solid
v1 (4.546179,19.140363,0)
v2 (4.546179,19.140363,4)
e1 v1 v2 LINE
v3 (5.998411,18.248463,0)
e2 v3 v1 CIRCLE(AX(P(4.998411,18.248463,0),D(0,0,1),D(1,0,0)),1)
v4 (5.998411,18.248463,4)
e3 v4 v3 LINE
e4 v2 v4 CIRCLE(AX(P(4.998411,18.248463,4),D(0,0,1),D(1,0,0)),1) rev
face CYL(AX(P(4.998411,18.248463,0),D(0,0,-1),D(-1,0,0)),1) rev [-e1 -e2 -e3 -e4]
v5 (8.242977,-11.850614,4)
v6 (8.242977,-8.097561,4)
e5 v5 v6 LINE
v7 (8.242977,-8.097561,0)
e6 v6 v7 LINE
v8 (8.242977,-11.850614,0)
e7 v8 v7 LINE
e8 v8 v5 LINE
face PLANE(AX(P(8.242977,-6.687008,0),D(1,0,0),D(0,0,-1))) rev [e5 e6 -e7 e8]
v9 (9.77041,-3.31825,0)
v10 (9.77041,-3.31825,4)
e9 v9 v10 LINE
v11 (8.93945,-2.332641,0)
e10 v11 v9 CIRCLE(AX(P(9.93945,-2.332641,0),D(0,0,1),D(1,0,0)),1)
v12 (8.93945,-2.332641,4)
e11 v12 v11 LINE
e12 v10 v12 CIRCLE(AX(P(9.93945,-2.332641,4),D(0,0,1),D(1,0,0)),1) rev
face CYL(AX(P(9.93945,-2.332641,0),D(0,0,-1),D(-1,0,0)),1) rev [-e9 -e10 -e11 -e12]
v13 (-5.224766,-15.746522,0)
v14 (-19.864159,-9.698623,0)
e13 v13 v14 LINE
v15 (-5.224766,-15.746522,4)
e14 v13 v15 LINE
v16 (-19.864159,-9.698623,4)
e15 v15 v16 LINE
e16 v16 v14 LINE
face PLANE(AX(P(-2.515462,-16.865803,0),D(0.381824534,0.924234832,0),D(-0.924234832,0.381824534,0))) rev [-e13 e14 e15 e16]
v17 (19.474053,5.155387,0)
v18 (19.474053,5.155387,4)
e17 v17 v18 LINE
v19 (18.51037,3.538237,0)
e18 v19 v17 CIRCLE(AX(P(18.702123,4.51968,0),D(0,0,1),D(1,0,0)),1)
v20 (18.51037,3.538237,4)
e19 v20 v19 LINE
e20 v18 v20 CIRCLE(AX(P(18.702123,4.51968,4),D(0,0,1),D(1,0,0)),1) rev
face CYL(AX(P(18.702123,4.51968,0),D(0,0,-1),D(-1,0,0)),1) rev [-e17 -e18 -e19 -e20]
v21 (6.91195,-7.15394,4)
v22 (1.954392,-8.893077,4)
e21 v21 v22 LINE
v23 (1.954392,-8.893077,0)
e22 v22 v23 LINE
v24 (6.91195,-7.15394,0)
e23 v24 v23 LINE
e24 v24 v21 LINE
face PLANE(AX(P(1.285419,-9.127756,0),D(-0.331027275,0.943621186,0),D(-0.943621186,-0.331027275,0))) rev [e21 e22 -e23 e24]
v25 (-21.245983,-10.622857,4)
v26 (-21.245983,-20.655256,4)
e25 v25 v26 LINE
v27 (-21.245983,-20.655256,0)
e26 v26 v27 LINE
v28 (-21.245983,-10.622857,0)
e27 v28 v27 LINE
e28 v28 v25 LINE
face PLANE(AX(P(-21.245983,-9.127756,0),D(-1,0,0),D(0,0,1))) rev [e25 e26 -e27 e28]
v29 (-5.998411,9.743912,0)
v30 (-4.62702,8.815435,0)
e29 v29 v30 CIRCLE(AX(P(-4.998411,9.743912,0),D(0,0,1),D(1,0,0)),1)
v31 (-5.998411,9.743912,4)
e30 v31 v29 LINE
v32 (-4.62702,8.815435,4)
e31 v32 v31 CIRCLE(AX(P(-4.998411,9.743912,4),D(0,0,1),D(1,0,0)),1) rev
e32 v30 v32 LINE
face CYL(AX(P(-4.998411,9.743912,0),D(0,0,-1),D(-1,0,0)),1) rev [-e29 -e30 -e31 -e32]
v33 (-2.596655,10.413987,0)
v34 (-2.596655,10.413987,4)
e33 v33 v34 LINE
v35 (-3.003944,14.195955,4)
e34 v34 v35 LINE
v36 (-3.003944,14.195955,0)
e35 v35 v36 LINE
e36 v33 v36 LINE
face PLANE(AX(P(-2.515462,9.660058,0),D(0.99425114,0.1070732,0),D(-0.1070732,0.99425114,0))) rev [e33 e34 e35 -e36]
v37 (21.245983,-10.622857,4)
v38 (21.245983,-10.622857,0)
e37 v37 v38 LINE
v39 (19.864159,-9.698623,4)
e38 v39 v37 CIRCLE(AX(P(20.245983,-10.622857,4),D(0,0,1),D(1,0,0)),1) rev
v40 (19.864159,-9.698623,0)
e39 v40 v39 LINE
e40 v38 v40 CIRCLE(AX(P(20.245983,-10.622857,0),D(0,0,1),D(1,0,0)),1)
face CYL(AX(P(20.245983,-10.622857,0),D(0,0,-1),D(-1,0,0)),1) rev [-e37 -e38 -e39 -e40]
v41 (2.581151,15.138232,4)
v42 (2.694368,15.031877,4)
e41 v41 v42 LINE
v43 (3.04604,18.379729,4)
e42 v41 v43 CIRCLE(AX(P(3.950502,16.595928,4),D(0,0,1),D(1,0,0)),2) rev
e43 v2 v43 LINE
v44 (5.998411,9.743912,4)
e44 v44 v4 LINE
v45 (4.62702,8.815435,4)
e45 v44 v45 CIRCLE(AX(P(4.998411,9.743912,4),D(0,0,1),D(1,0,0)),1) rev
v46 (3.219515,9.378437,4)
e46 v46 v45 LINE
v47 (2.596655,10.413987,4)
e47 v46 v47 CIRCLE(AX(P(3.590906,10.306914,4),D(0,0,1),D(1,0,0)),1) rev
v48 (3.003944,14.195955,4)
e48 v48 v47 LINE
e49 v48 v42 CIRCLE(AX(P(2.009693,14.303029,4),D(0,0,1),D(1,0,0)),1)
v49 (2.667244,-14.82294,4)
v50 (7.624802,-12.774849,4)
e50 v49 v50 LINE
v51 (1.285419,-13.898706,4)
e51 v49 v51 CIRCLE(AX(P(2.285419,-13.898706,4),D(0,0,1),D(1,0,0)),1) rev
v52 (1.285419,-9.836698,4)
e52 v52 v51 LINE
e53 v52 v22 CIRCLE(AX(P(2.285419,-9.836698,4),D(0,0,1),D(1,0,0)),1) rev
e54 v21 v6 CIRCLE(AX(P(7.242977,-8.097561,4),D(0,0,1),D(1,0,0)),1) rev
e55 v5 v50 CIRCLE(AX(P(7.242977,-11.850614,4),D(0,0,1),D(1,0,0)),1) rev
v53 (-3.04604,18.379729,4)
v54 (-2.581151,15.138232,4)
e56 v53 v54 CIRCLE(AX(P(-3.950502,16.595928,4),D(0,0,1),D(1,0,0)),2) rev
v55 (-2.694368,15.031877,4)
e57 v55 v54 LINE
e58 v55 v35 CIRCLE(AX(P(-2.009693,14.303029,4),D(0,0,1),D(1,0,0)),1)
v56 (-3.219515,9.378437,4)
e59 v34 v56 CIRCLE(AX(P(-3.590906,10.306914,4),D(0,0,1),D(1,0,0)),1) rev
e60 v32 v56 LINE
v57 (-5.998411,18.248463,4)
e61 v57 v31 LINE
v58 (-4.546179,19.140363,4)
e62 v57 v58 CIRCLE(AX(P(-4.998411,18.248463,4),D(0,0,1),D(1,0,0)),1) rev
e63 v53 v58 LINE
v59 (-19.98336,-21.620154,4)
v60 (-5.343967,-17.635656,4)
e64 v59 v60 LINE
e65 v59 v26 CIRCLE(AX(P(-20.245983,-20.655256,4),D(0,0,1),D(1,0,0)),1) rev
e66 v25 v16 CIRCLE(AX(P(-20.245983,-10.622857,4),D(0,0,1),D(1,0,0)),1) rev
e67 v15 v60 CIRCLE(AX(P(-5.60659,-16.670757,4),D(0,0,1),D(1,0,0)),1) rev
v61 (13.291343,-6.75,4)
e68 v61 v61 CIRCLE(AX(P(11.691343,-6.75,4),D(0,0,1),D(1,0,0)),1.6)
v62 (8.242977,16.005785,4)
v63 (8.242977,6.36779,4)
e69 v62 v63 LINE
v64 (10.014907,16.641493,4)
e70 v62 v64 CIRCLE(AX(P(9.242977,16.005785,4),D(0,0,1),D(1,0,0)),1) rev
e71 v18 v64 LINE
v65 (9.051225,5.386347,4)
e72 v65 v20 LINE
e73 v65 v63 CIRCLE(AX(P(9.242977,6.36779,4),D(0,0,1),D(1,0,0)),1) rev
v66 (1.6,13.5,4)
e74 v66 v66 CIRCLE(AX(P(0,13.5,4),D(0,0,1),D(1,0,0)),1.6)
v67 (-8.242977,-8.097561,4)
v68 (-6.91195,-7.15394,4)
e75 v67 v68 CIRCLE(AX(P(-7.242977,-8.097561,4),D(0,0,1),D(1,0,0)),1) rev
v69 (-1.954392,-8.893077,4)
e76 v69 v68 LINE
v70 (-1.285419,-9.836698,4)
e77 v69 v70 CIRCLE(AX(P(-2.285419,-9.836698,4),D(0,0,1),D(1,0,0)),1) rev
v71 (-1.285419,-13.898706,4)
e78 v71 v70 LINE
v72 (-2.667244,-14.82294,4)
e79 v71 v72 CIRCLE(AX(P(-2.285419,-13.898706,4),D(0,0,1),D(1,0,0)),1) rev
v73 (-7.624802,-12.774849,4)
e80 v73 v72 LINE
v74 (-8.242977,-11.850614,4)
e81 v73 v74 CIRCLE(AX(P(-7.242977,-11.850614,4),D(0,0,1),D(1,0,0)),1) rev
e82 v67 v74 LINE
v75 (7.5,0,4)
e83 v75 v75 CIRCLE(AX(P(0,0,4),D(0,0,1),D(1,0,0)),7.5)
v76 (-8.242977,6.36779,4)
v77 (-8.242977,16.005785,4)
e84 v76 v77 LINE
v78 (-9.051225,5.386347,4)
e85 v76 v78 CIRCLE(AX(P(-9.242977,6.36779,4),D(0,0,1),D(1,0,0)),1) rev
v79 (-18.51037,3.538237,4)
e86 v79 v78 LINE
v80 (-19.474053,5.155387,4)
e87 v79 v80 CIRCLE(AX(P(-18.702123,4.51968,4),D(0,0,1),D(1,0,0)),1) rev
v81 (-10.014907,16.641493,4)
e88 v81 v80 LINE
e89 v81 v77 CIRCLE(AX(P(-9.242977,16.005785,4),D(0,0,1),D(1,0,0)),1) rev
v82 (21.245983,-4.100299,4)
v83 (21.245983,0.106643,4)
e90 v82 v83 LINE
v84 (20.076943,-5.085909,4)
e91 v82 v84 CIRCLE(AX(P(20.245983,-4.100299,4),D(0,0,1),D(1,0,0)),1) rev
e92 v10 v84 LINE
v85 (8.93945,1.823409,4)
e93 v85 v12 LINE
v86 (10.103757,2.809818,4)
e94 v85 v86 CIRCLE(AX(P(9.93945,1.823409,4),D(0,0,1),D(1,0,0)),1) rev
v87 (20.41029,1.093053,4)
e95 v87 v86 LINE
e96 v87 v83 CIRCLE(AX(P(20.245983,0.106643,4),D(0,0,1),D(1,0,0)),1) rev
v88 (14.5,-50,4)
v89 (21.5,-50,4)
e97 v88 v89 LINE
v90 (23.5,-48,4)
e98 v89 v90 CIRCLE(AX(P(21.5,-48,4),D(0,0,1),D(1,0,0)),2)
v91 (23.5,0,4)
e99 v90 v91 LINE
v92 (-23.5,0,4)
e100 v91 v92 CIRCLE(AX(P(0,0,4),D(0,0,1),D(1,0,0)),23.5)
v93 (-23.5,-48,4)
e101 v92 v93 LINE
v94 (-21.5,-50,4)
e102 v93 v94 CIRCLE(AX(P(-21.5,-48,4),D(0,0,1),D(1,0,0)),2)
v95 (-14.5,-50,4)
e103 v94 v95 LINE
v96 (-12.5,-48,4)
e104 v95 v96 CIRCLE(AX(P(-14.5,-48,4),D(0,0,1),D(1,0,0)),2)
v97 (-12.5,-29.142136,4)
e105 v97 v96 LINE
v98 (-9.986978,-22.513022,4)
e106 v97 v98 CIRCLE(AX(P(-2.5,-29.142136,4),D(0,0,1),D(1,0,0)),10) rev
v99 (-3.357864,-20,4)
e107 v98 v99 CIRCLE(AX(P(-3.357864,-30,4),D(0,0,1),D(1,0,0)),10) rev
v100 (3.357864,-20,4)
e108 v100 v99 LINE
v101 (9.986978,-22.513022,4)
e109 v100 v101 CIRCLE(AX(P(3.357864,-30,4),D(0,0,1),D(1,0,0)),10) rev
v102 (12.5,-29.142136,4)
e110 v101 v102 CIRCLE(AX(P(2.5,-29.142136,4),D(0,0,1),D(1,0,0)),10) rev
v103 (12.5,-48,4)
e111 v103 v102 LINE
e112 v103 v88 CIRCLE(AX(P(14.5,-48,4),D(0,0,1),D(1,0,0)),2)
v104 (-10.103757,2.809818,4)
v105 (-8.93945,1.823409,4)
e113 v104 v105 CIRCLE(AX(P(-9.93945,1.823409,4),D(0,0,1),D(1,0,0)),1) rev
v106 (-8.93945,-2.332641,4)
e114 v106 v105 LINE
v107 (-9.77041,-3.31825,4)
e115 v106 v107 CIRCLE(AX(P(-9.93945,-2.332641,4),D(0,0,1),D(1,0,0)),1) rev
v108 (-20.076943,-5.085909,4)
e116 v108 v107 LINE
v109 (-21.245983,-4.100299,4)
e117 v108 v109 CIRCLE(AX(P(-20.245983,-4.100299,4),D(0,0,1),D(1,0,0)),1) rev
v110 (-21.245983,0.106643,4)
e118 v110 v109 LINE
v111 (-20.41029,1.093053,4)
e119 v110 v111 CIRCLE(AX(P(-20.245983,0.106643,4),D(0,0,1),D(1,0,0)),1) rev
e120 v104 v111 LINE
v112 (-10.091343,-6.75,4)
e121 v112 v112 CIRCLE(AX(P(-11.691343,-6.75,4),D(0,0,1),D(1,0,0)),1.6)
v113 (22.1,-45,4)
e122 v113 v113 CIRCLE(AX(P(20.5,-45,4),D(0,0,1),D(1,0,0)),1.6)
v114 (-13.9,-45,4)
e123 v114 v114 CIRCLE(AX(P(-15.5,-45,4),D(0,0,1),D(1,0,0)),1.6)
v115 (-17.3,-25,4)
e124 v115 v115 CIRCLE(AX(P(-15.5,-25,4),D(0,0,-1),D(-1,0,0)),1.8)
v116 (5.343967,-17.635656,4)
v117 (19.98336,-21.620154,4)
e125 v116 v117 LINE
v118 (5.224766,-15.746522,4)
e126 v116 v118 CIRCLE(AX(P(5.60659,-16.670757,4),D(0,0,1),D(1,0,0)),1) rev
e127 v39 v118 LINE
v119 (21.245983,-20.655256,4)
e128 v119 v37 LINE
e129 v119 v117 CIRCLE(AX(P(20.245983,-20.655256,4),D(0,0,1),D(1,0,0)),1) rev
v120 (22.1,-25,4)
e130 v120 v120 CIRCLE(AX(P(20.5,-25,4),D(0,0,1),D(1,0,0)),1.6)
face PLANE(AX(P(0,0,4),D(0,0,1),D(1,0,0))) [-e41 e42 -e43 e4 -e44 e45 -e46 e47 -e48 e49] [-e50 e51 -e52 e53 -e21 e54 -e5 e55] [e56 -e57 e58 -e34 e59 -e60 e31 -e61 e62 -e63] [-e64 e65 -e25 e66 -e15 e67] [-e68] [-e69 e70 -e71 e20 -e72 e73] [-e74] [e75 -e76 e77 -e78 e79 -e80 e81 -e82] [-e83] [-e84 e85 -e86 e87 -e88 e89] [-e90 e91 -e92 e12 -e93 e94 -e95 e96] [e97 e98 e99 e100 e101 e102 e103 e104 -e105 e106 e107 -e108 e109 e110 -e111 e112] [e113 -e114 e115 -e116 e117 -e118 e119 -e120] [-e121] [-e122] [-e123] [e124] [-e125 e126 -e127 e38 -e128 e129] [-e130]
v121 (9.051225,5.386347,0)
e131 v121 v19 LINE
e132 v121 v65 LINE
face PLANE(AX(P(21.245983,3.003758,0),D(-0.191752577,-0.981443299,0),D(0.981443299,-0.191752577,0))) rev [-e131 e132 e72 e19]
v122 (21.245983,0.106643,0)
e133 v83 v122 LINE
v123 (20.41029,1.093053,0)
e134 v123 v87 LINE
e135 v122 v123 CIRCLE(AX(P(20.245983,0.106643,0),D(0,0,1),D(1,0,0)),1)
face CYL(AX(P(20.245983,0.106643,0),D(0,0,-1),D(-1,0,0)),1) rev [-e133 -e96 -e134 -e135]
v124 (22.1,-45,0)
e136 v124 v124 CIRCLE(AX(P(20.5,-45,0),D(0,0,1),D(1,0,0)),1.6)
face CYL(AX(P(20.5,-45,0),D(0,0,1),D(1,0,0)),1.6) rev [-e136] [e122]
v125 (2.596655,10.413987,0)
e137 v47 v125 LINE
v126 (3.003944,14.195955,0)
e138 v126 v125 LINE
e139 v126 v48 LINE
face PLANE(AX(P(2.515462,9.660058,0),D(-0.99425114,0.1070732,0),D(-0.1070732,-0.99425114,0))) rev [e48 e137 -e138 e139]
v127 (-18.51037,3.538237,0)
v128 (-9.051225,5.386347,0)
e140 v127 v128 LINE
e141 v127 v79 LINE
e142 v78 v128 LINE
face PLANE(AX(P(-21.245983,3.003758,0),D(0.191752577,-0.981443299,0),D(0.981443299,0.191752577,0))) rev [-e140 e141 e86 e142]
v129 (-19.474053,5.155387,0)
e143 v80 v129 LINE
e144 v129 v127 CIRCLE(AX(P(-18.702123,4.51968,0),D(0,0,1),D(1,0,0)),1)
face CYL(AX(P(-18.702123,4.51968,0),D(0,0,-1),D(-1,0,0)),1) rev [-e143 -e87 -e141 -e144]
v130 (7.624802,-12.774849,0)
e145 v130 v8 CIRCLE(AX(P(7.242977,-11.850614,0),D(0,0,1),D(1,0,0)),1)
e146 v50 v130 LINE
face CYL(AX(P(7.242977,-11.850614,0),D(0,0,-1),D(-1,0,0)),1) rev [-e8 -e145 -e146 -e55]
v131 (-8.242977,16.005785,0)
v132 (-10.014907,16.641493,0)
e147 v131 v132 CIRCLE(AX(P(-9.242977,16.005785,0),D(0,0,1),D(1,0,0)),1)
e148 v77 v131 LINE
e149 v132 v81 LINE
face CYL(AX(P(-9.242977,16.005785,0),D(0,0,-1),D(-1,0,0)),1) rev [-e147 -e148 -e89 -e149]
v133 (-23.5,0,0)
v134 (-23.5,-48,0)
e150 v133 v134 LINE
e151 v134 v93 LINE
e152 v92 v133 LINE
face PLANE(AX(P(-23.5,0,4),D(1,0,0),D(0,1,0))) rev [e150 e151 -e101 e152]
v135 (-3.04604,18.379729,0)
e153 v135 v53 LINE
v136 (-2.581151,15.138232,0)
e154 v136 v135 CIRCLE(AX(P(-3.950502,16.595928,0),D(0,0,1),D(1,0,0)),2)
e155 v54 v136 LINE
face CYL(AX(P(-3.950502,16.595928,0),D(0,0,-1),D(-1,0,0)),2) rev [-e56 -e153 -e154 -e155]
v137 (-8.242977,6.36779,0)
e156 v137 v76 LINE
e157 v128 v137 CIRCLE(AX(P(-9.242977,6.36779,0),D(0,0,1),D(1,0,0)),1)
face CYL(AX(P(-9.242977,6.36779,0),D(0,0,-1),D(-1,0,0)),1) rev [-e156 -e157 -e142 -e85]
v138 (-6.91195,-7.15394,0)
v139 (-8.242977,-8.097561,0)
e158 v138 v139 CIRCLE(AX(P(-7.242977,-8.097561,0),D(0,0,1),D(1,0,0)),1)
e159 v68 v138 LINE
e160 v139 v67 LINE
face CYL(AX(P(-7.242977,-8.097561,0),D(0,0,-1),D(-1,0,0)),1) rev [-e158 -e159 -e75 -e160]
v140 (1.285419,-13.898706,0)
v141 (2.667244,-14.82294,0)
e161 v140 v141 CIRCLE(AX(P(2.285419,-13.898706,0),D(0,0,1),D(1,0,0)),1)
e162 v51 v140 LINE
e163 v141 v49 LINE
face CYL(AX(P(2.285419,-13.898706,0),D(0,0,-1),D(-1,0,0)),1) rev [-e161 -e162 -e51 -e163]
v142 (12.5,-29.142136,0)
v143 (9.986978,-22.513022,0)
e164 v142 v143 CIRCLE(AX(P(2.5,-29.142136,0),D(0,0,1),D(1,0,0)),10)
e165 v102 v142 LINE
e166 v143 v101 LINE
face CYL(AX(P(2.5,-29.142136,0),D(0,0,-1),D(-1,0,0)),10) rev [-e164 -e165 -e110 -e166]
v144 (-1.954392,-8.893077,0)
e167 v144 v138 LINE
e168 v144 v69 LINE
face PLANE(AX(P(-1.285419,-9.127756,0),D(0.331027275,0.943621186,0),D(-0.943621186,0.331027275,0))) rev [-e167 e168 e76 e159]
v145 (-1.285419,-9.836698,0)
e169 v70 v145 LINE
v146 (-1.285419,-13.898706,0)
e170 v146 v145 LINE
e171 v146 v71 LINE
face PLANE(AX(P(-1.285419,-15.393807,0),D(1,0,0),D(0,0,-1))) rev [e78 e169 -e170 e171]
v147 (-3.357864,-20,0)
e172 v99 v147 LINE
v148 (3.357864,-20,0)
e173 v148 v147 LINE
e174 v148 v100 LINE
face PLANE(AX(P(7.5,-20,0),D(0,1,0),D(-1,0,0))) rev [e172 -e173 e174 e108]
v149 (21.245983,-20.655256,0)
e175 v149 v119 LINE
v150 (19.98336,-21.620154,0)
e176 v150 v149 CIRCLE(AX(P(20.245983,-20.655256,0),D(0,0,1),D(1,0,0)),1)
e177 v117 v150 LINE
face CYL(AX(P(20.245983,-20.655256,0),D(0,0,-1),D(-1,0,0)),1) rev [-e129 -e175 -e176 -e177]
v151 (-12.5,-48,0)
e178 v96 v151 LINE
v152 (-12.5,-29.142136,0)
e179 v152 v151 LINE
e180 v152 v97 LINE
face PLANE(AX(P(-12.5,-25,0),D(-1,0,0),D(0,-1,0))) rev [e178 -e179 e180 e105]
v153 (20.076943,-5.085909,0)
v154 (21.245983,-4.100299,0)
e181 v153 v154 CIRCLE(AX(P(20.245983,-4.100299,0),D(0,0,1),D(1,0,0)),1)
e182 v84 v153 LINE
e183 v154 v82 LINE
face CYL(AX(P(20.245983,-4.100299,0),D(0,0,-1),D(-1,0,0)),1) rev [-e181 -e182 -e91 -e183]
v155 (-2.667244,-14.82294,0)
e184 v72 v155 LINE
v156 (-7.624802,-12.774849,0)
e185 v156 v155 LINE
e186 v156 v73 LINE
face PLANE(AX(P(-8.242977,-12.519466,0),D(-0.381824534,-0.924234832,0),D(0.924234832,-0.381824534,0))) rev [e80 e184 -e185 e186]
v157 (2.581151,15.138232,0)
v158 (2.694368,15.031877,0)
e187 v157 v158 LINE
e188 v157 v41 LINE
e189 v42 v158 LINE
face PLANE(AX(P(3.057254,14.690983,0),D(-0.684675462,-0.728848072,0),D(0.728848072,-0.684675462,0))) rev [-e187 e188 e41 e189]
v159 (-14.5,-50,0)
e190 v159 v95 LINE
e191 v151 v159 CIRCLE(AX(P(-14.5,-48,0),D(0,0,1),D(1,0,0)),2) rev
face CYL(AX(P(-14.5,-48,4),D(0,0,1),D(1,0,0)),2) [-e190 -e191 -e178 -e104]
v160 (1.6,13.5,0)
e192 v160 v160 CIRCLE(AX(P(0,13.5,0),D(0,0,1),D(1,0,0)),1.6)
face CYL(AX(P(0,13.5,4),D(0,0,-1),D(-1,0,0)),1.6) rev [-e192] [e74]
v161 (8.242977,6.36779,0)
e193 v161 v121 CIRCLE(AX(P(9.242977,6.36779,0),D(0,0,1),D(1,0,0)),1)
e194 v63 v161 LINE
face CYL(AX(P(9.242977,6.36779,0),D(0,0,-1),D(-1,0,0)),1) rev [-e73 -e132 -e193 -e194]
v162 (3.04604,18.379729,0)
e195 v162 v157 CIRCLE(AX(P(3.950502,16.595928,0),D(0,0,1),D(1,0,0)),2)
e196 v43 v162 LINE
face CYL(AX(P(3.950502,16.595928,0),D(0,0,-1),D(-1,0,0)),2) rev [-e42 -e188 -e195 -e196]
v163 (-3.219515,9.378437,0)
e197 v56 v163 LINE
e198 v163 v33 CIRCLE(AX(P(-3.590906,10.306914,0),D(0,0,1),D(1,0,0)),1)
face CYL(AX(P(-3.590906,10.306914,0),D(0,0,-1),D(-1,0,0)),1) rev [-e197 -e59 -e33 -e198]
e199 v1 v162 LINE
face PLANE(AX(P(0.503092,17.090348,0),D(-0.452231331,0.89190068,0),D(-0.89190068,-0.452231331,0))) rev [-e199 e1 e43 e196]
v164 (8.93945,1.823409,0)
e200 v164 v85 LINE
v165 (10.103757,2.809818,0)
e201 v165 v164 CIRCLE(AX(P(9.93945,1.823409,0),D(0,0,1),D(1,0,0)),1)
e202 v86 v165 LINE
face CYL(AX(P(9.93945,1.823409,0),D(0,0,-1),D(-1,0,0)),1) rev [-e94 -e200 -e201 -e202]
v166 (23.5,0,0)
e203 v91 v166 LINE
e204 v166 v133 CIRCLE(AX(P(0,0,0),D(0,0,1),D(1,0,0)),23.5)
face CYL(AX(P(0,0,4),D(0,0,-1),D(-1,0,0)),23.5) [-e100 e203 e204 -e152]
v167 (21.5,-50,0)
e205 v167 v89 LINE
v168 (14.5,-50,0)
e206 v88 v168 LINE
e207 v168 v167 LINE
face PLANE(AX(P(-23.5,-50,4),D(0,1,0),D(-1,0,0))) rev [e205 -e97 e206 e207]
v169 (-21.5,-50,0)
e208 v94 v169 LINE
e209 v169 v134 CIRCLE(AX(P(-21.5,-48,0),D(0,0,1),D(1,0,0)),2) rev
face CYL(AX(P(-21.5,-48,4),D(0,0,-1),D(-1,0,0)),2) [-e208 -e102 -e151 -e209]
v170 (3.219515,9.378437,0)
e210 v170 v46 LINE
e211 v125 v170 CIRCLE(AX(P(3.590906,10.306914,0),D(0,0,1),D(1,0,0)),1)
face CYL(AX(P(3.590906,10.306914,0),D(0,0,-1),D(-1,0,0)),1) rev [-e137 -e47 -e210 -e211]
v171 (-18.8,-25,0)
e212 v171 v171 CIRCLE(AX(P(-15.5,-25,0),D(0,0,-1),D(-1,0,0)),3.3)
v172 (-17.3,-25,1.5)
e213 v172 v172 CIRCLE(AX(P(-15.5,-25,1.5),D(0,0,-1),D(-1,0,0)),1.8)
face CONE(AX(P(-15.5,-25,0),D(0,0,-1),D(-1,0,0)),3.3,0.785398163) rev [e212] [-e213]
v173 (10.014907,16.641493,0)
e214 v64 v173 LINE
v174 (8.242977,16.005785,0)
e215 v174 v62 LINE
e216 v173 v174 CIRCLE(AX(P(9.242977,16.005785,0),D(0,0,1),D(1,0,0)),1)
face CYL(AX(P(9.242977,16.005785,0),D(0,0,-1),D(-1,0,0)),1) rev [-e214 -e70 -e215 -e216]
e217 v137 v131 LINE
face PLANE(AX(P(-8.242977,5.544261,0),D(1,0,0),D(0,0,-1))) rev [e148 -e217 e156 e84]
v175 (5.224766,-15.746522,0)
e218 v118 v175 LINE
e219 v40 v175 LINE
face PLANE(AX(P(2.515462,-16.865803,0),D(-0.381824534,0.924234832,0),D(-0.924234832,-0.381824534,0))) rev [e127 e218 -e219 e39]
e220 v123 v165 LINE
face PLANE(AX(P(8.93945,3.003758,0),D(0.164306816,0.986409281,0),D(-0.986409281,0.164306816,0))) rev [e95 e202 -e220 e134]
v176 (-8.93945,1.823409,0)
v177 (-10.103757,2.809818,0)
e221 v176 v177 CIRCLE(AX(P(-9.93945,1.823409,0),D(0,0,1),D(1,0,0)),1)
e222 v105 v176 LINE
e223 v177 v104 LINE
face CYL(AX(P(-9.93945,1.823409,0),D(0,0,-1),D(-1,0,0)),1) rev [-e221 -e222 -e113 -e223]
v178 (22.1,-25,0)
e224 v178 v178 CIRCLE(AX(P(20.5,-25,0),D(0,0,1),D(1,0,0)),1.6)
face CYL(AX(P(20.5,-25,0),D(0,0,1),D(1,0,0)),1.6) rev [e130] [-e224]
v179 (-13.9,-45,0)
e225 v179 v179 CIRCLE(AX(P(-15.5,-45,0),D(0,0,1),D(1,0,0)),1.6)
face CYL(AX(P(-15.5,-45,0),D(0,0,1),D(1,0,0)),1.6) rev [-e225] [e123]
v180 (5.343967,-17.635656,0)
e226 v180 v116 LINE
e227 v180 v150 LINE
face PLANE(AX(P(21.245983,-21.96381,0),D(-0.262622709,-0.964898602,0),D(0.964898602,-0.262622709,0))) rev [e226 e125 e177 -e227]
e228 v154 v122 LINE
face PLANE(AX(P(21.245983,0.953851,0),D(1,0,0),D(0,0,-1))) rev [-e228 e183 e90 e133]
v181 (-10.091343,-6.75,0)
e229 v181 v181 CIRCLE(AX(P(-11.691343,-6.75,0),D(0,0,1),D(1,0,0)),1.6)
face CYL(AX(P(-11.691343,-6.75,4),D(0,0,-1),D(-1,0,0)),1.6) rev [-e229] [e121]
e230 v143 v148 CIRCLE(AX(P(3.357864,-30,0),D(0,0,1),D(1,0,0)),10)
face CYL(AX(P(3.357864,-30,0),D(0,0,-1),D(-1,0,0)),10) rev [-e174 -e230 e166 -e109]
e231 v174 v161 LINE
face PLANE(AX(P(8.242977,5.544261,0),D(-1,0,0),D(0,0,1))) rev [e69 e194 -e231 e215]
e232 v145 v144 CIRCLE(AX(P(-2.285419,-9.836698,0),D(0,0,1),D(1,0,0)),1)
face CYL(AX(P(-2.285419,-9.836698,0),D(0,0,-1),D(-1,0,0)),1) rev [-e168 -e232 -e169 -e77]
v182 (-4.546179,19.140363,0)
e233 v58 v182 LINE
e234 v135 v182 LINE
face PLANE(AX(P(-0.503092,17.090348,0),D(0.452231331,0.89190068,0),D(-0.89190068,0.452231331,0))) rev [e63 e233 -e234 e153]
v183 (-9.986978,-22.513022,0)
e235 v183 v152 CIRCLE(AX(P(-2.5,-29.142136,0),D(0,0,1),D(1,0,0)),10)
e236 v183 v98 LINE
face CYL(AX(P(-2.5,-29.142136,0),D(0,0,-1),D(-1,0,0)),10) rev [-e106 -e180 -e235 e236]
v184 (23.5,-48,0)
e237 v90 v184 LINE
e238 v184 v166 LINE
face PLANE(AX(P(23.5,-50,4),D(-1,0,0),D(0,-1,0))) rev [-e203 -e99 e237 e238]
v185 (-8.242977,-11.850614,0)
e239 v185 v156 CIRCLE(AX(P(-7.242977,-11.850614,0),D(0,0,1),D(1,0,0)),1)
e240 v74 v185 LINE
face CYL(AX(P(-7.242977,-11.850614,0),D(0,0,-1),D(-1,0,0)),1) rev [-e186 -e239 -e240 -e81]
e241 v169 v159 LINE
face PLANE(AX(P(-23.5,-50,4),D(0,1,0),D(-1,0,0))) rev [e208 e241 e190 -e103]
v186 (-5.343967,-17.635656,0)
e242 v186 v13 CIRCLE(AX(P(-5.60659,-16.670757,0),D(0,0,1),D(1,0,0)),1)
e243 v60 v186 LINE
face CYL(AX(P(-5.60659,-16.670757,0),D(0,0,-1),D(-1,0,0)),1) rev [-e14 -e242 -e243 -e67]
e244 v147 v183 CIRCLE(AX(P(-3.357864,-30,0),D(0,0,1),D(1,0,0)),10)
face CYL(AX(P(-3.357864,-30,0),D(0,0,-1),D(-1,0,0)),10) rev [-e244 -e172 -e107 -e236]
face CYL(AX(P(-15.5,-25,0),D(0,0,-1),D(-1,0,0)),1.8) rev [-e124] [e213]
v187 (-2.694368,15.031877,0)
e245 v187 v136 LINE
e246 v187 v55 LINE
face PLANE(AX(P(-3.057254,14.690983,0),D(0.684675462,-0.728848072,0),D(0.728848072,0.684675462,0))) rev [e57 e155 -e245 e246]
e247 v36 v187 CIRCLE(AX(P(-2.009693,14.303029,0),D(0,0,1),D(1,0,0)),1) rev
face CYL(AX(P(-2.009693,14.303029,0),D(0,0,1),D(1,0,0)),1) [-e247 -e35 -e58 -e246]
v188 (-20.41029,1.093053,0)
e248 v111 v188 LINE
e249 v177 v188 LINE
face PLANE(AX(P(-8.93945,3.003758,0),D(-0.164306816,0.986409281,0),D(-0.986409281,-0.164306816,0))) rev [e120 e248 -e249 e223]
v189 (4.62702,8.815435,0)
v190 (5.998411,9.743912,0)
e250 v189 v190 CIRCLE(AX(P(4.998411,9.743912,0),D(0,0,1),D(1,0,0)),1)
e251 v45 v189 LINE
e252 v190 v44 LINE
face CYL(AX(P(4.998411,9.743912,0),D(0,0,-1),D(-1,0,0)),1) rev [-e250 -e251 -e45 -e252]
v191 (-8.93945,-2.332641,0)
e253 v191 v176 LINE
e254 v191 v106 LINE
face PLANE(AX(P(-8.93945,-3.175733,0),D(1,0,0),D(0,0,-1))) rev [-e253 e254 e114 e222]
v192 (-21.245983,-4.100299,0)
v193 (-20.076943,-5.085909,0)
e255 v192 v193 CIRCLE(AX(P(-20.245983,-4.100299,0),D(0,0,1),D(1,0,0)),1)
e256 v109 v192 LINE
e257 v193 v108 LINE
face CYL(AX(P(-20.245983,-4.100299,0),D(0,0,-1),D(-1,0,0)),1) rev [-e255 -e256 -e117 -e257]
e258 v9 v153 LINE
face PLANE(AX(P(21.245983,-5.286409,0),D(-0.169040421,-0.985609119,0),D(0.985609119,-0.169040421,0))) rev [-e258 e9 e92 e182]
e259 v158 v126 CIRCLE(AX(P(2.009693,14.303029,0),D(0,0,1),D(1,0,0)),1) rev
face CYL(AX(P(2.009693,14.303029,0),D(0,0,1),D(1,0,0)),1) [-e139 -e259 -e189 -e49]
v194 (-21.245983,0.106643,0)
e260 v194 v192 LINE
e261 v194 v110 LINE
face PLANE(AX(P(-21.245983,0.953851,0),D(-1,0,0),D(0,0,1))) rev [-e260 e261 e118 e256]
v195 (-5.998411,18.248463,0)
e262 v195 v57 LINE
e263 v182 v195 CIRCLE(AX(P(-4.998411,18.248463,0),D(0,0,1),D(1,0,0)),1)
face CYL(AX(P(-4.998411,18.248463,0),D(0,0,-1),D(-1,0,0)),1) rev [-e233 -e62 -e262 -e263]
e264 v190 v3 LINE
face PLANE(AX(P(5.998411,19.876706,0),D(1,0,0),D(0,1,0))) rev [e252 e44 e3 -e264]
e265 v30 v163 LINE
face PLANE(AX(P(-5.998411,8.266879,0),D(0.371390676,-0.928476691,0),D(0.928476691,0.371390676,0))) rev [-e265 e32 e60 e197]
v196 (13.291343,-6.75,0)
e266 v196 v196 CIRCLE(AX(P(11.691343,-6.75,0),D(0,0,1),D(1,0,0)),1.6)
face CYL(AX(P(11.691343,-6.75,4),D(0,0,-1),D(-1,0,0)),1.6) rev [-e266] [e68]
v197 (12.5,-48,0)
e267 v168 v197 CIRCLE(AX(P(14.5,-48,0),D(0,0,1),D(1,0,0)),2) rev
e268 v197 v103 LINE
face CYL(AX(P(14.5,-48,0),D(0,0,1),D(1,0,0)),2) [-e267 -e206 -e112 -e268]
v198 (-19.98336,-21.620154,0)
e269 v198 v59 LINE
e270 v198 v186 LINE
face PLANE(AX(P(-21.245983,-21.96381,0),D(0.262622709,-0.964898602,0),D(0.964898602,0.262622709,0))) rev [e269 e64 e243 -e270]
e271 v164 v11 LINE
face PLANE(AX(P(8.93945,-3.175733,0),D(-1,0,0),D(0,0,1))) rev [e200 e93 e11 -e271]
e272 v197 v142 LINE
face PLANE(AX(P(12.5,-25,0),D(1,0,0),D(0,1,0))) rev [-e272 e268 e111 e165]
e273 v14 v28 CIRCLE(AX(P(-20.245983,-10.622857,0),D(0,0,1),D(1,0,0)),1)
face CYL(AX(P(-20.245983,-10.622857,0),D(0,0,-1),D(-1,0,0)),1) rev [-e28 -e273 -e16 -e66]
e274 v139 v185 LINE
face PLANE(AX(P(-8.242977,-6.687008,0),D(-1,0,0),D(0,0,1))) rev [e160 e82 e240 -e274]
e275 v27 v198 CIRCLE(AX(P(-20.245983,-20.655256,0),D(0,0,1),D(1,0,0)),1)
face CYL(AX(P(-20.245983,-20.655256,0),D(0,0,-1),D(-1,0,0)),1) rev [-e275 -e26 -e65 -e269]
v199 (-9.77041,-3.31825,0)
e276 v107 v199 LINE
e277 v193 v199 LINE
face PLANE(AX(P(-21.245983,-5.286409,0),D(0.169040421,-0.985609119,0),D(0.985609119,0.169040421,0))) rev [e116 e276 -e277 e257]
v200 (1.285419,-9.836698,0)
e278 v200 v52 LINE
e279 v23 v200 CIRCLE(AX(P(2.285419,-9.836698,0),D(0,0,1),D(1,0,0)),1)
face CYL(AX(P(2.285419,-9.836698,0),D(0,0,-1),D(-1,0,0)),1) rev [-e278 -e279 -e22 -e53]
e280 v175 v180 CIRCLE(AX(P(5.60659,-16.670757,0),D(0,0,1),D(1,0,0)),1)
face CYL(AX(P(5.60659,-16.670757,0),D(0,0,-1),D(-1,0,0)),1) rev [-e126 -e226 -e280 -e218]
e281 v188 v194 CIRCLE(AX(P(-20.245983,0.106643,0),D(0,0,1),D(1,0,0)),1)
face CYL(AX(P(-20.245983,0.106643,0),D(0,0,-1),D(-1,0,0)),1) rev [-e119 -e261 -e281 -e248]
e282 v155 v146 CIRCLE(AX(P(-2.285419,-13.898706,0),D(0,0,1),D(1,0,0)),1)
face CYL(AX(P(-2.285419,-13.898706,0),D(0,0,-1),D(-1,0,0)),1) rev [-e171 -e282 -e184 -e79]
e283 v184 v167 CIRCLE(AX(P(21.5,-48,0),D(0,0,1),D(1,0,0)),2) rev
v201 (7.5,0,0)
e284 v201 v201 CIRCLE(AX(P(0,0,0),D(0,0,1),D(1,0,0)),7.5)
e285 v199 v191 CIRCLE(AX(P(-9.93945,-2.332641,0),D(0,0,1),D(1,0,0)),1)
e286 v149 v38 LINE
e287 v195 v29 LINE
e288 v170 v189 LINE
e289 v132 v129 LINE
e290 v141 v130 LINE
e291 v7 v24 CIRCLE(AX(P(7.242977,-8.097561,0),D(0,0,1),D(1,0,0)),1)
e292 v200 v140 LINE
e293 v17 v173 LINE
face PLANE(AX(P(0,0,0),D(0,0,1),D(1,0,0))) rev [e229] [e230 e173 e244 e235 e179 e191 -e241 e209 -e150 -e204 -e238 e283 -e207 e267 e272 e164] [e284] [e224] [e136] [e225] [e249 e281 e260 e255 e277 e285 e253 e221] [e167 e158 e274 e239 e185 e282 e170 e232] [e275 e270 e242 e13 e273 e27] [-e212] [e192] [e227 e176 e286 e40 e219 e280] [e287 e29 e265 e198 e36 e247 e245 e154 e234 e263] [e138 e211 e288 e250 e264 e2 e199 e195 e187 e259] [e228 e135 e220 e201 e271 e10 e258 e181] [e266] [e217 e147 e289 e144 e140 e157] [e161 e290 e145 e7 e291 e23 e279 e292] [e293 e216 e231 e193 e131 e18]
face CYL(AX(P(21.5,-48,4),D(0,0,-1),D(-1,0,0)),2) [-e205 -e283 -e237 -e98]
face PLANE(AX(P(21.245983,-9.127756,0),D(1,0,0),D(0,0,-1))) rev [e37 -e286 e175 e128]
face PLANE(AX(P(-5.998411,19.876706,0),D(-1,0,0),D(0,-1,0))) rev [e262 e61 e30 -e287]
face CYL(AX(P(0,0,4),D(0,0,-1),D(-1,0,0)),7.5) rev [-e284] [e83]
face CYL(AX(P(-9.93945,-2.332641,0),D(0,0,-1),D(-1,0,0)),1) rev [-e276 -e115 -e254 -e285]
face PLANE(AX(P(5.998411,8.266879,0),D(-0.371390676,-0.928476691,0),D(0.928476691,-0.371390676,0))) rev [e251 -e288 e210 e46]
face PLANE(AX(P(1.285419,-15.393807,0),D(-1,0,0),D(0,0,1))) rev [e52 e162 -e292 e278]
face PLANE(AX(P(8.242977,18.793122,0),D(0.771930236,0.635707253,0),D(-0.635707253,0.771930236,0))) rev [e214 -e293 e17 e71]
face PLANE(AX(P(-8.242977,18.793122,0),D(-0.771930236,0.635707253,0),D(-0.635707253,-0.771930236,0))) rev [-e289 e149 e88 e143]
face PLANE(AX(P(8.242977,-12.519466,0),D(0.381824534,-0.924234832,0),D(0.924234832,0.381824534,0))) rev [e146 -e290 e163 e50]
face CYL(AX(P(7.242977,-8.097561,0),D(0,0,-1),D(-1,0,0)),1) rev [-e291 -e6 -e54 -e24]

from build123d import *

# Parameters (mm, degrees)
SKETCH_1_R                   = 1.6
SKETCH_1_R_2                 = 7.5
EXTRUDE_1_DEPTH              = 4
SKETCH_2_R                   = 1.6
CUT_EXTRUDE_1_DEPTH          = 56.391786395
CUT_EXTRUDE_2_DEPTH          = 56.391786395
FILLET_2_R                   = 10
FILLET_3_R                   = 2
CUT_EXTRUDE_3_DEPTH          = 56.391786395
FILLET_4_R                   = 2
FILLET_5_R                   = 1
HOLE_WIZARD_M3_1_D           = 3.6
HOLE_WIZARD_M3_1_CSINK_D     = 6.6
HOLE_WIZARD_M3_1_CSINK_ANGLE = 90


with BuildPart() as part:
    # 草图1 → 凸台-拉伸1 (new body)
    with BuildSketch(Plane.XY):
        with BuildLine():
            Line((-23.5, 0), (-23.5, -50))
            Line((-23.5, -50), (23.5, -50))
            Line((23.5, -50), (23.5, 0))
            ThreePointArc((23.5, 0), (0, 23.5), (-23.5, 0))
        make_face()
        with Locations((0, 13.5)):
            Circle(SKETCH_1_R, mode=Mode.SUBTRACT)
        with Locations((11.691342951, -6.75)):
            Circle(SKETCH_1_R, mode=Mode.SUBTRACT)
        with Locations((-11.691342951, -6.75)):
            Circle(SKETCH_1_R, mode=Mode.SUBTRACT)
        Circle(SKETCH_1_R_2, mode=Mode.SUBTRACT)
    extrude(amount=EXTRUDE_1_DEPTH)

    # 草图2 → 切除-拉伸1 (cut, through all)
    with BuildSketch(Plane.XY.offset(4)):
        with Locations((20.5, -45)):
            Circle(SKETCH_2_R)
        with Locations((20.5, -25)):
            Circle(SKETCH_2_R)
        with Locations((-15.5, -45)):
            Circle(SKETCH_2_R)
        with Locations((-15.5, -25)):
            Circle(SKETCH_2_R)
    extrude(amount=-CUT_EXTRUDE_1_DEPTH, mode=Mode.SUBTRACT)

    # 草图3 → 切除-拉伸2 (cut, through all)
    with BuildSketch(Plane.XY.offset(4)):
        Polygon((12.5, -25), (7.5, -20), (-7.5, -20), (-12.5, -25), (-12.5, -50), (12.5, -50), align=None)
    extrude(amount=-CUT_EXTRUDE_2_DEPTH, mode=Mode.SUBTRACT)

    # 圆角2
    # the kernel refuses this fillet: 10 mm, written as the material it adds along each edge
    with BuildSketch(Plane(origin=(-12.5, -25, 4), x_dir=(0, -1, 0), z_dir=(0, 0, -1))) as fillet_2_piece_1:
        with BuildLine():
            CenterArc((FILLET_2_R * 0.414213562373, -FILLET_2_R), FILLET_2_R, 90, 45)
            Line((-FILLET_2_R * 0.292893218813, -FILLET_2_R * 0.292893218813), (0, 0))
            Line((0, 0), (FILLET_2_R * 0.414213562373, 0))
        make_face()
    extrude(amount=4)
    with BuildSketch(Plane(origin=(-7.5, -20, 4), x_dir=(1, 0, 0), z_dir=(0, 0, -1)), Plane(origin=(7.5, -20, 4), x_dir=(0.7071067811865472, -0.7071067811865479, 0), z_dir=(0, 0, -1)), Plane(origin=(12.5, -25, 4), x_dir=(0, -1, 0), z_dir=(0, 0, -1))) as fillet_2_piece_2:
        with BuildLine():
            CenterArc((FILLET_2_R * 0.414213562373, FILLET_2_R), FILLET_2_R, 225, 45)
            Line((-FILLET_2_R * 0.292893218813, FILLET_2_R * 0.292893218813), (0, 0))
            Line((0, 0), (FILLET_2_R * 0.414213562373, 0))
        make_face()
    extrude(amount=4)

    # 圆角3
    fillet_3_edges = [part.edges().sort_by_distance(p)[0] for p in [
        (-12.5, -50, 2),
        (12.5, -50, 2),
        (23.5, -50, 2),
        (-23.5, -50, 2),
    ]]
    fillet(fillet_3_edges, radius=FILLET_3_R)

    # 草图4 → 切除-拉伸3 (cut, through all)
    with BuildSketch(Plane.XY.offset(4)):
        Polygon((8.242977091, 18.793122214), (21.245983207, 3.003757645), (8.242977091, 5.544260941), align=None)
        Polygon((5.998410559, 19.876706057), (5.998410559, 8.266879168), (2.515462493, 9.660058395), (3.057254414, 14.69098338), (0.503092499, 17.090347604), align=None)
        Polygon((21.245983207, 0.953850638), (21.245983207, -5.286408991), (8.939449972, -3.17573294), (8.939449972, 3.003757645), align=None)
        Polygon((21.245983207, -9.127756299), (21.245983207, -21.963810312), (2.515462493, -16.865803044), align=None)
        Polygon((8.242977091, -6.687008394), (8.242977091, -12.519465541), (1.285419198, -15.393806785), (1.285419198, -9.127756299), align=None)
        Polygon((-3.057254414, 14.69098338), (-0.503092499, 17.090347604), (-5.998410559, 19.876706057), (-5.998410559, 8.266879168), (-2.515462493, 9.660058395), align=None)
        Polygon((-21.245983207, 3.003757645), (-8.242977091, 5.544260941), (-8.242977091, 18.793122214), align=None)
        Polygon((-8.939449972, -3.17573294), (-8.939449972, 3.003757645), (-21.245983207, 0.953850638), (-21.245983207, -5.286408991), align=None)
        Polygon((-21.245983207, -21.963810312), (-2.515462493, -16.865803044), (-21.245983207, -9.127756299), align=None)
        Polygon((-1.285419198, -15.393806785), (-1.285419198, -9.127756299), (-8.242977091, -6.687008394), (-8.242977091, -12.519465541), align=None)
    extrude(amount=-CUT_EXTRUDE_3_DEPTH, mode=Mode.SUBTRACT)

    # 圆角4
    fillet_4_edges = [part.edges().sort_by_distance(p)[0] for p in [
        (0.503092499, 17.090347604, 2),
        (-0.503092499, 17.090347604, 2),
    ]]
    fillet(fillet_4_edges, radius=FILLET_4_R)

    # 圆角5
    fillet_5_edges = [part.edges().sort_by_distance(p)[0] for p in [
        (5.998410559, 19.876706057, 2),
        (5.998410559, 8.266879168, 2),
        (2.515462493, 9.660058395, 2),
        (3.057254414, 14.69098338, 2),
        (8.939449972, 3.003757645, 2),
        (21.245983207, 0.953850638, 2),
        (21.245983207, -5.286408991, 2),
        (8.939449972, -3.17573294, 2),
        (1.285419198, -9.127756299, 2),
        (8.242977091, -6.687008394, 2),
        (8.242977091, -12.519465541, 2),
        (1.285419198, -15.393806785, 2),
        (2.515462493, -16.865803044, 2),
        (21.245983207, -9.127756299, 2),
        (21.245983207, -21.963810312, 2),
        (-21.245983207, -21.963810312, 2),
        (-21.245983207, -9.127756299, 2),
        (-2.515462493, -16.865803044, 2),
        (-8.939449972, -3.17573294, 2),
        (-21.245983207, -5.286408991, 2),
        (-21.245983207, 0.953850638, 2),
        (-8.939449972, 3.003757645, 2),
        (-21.245983207, 3.003757645, 2),
        (-8.242977091, 18.793122214, 2),
        (-8.242977091, 5.544260941, 2),
        (-3.057254414, 14.69098338, 2),
        (-2.515462493, 9.660058395, 2),
        (-5.998410559, 8.266879168, 2),
        (-5.998410559, 19.876706057, 2),
        (-1.285419198, -15.393806785, 2),
        (-8.242977091, -12.519465541, 2),
        (-8.242977091, -6.687008394, 2),
        (-1.285419198, -9.127756299, 2),
        (8.242977091, 5.544260941, 2),
        (8.242977091, 18.793122214, 2),
        (21.245983207, 3.003757645, 2),
    ]]
    fillet(fillet_5_edges, radius=FILLET_5_R)

    # M3 十字槽半沉头木螺钉的锥形沉头孔1 (through all)
    with Locations(Plane(origin=(0, 0, 0), x_dir=(-1, 0, 0), z_dir=(0, 0, -1))):
        with Locations((15.5, -25)):
            CounterSinkHole(HOLE_WIZARD_M3_1_D / 2, HOLE_WIZARD_M3_1_CSINK_D / 2, counter_sink_angle=HOLE_WIZARD_M3_1_CSINK_ANGLE)


solid = part.part
